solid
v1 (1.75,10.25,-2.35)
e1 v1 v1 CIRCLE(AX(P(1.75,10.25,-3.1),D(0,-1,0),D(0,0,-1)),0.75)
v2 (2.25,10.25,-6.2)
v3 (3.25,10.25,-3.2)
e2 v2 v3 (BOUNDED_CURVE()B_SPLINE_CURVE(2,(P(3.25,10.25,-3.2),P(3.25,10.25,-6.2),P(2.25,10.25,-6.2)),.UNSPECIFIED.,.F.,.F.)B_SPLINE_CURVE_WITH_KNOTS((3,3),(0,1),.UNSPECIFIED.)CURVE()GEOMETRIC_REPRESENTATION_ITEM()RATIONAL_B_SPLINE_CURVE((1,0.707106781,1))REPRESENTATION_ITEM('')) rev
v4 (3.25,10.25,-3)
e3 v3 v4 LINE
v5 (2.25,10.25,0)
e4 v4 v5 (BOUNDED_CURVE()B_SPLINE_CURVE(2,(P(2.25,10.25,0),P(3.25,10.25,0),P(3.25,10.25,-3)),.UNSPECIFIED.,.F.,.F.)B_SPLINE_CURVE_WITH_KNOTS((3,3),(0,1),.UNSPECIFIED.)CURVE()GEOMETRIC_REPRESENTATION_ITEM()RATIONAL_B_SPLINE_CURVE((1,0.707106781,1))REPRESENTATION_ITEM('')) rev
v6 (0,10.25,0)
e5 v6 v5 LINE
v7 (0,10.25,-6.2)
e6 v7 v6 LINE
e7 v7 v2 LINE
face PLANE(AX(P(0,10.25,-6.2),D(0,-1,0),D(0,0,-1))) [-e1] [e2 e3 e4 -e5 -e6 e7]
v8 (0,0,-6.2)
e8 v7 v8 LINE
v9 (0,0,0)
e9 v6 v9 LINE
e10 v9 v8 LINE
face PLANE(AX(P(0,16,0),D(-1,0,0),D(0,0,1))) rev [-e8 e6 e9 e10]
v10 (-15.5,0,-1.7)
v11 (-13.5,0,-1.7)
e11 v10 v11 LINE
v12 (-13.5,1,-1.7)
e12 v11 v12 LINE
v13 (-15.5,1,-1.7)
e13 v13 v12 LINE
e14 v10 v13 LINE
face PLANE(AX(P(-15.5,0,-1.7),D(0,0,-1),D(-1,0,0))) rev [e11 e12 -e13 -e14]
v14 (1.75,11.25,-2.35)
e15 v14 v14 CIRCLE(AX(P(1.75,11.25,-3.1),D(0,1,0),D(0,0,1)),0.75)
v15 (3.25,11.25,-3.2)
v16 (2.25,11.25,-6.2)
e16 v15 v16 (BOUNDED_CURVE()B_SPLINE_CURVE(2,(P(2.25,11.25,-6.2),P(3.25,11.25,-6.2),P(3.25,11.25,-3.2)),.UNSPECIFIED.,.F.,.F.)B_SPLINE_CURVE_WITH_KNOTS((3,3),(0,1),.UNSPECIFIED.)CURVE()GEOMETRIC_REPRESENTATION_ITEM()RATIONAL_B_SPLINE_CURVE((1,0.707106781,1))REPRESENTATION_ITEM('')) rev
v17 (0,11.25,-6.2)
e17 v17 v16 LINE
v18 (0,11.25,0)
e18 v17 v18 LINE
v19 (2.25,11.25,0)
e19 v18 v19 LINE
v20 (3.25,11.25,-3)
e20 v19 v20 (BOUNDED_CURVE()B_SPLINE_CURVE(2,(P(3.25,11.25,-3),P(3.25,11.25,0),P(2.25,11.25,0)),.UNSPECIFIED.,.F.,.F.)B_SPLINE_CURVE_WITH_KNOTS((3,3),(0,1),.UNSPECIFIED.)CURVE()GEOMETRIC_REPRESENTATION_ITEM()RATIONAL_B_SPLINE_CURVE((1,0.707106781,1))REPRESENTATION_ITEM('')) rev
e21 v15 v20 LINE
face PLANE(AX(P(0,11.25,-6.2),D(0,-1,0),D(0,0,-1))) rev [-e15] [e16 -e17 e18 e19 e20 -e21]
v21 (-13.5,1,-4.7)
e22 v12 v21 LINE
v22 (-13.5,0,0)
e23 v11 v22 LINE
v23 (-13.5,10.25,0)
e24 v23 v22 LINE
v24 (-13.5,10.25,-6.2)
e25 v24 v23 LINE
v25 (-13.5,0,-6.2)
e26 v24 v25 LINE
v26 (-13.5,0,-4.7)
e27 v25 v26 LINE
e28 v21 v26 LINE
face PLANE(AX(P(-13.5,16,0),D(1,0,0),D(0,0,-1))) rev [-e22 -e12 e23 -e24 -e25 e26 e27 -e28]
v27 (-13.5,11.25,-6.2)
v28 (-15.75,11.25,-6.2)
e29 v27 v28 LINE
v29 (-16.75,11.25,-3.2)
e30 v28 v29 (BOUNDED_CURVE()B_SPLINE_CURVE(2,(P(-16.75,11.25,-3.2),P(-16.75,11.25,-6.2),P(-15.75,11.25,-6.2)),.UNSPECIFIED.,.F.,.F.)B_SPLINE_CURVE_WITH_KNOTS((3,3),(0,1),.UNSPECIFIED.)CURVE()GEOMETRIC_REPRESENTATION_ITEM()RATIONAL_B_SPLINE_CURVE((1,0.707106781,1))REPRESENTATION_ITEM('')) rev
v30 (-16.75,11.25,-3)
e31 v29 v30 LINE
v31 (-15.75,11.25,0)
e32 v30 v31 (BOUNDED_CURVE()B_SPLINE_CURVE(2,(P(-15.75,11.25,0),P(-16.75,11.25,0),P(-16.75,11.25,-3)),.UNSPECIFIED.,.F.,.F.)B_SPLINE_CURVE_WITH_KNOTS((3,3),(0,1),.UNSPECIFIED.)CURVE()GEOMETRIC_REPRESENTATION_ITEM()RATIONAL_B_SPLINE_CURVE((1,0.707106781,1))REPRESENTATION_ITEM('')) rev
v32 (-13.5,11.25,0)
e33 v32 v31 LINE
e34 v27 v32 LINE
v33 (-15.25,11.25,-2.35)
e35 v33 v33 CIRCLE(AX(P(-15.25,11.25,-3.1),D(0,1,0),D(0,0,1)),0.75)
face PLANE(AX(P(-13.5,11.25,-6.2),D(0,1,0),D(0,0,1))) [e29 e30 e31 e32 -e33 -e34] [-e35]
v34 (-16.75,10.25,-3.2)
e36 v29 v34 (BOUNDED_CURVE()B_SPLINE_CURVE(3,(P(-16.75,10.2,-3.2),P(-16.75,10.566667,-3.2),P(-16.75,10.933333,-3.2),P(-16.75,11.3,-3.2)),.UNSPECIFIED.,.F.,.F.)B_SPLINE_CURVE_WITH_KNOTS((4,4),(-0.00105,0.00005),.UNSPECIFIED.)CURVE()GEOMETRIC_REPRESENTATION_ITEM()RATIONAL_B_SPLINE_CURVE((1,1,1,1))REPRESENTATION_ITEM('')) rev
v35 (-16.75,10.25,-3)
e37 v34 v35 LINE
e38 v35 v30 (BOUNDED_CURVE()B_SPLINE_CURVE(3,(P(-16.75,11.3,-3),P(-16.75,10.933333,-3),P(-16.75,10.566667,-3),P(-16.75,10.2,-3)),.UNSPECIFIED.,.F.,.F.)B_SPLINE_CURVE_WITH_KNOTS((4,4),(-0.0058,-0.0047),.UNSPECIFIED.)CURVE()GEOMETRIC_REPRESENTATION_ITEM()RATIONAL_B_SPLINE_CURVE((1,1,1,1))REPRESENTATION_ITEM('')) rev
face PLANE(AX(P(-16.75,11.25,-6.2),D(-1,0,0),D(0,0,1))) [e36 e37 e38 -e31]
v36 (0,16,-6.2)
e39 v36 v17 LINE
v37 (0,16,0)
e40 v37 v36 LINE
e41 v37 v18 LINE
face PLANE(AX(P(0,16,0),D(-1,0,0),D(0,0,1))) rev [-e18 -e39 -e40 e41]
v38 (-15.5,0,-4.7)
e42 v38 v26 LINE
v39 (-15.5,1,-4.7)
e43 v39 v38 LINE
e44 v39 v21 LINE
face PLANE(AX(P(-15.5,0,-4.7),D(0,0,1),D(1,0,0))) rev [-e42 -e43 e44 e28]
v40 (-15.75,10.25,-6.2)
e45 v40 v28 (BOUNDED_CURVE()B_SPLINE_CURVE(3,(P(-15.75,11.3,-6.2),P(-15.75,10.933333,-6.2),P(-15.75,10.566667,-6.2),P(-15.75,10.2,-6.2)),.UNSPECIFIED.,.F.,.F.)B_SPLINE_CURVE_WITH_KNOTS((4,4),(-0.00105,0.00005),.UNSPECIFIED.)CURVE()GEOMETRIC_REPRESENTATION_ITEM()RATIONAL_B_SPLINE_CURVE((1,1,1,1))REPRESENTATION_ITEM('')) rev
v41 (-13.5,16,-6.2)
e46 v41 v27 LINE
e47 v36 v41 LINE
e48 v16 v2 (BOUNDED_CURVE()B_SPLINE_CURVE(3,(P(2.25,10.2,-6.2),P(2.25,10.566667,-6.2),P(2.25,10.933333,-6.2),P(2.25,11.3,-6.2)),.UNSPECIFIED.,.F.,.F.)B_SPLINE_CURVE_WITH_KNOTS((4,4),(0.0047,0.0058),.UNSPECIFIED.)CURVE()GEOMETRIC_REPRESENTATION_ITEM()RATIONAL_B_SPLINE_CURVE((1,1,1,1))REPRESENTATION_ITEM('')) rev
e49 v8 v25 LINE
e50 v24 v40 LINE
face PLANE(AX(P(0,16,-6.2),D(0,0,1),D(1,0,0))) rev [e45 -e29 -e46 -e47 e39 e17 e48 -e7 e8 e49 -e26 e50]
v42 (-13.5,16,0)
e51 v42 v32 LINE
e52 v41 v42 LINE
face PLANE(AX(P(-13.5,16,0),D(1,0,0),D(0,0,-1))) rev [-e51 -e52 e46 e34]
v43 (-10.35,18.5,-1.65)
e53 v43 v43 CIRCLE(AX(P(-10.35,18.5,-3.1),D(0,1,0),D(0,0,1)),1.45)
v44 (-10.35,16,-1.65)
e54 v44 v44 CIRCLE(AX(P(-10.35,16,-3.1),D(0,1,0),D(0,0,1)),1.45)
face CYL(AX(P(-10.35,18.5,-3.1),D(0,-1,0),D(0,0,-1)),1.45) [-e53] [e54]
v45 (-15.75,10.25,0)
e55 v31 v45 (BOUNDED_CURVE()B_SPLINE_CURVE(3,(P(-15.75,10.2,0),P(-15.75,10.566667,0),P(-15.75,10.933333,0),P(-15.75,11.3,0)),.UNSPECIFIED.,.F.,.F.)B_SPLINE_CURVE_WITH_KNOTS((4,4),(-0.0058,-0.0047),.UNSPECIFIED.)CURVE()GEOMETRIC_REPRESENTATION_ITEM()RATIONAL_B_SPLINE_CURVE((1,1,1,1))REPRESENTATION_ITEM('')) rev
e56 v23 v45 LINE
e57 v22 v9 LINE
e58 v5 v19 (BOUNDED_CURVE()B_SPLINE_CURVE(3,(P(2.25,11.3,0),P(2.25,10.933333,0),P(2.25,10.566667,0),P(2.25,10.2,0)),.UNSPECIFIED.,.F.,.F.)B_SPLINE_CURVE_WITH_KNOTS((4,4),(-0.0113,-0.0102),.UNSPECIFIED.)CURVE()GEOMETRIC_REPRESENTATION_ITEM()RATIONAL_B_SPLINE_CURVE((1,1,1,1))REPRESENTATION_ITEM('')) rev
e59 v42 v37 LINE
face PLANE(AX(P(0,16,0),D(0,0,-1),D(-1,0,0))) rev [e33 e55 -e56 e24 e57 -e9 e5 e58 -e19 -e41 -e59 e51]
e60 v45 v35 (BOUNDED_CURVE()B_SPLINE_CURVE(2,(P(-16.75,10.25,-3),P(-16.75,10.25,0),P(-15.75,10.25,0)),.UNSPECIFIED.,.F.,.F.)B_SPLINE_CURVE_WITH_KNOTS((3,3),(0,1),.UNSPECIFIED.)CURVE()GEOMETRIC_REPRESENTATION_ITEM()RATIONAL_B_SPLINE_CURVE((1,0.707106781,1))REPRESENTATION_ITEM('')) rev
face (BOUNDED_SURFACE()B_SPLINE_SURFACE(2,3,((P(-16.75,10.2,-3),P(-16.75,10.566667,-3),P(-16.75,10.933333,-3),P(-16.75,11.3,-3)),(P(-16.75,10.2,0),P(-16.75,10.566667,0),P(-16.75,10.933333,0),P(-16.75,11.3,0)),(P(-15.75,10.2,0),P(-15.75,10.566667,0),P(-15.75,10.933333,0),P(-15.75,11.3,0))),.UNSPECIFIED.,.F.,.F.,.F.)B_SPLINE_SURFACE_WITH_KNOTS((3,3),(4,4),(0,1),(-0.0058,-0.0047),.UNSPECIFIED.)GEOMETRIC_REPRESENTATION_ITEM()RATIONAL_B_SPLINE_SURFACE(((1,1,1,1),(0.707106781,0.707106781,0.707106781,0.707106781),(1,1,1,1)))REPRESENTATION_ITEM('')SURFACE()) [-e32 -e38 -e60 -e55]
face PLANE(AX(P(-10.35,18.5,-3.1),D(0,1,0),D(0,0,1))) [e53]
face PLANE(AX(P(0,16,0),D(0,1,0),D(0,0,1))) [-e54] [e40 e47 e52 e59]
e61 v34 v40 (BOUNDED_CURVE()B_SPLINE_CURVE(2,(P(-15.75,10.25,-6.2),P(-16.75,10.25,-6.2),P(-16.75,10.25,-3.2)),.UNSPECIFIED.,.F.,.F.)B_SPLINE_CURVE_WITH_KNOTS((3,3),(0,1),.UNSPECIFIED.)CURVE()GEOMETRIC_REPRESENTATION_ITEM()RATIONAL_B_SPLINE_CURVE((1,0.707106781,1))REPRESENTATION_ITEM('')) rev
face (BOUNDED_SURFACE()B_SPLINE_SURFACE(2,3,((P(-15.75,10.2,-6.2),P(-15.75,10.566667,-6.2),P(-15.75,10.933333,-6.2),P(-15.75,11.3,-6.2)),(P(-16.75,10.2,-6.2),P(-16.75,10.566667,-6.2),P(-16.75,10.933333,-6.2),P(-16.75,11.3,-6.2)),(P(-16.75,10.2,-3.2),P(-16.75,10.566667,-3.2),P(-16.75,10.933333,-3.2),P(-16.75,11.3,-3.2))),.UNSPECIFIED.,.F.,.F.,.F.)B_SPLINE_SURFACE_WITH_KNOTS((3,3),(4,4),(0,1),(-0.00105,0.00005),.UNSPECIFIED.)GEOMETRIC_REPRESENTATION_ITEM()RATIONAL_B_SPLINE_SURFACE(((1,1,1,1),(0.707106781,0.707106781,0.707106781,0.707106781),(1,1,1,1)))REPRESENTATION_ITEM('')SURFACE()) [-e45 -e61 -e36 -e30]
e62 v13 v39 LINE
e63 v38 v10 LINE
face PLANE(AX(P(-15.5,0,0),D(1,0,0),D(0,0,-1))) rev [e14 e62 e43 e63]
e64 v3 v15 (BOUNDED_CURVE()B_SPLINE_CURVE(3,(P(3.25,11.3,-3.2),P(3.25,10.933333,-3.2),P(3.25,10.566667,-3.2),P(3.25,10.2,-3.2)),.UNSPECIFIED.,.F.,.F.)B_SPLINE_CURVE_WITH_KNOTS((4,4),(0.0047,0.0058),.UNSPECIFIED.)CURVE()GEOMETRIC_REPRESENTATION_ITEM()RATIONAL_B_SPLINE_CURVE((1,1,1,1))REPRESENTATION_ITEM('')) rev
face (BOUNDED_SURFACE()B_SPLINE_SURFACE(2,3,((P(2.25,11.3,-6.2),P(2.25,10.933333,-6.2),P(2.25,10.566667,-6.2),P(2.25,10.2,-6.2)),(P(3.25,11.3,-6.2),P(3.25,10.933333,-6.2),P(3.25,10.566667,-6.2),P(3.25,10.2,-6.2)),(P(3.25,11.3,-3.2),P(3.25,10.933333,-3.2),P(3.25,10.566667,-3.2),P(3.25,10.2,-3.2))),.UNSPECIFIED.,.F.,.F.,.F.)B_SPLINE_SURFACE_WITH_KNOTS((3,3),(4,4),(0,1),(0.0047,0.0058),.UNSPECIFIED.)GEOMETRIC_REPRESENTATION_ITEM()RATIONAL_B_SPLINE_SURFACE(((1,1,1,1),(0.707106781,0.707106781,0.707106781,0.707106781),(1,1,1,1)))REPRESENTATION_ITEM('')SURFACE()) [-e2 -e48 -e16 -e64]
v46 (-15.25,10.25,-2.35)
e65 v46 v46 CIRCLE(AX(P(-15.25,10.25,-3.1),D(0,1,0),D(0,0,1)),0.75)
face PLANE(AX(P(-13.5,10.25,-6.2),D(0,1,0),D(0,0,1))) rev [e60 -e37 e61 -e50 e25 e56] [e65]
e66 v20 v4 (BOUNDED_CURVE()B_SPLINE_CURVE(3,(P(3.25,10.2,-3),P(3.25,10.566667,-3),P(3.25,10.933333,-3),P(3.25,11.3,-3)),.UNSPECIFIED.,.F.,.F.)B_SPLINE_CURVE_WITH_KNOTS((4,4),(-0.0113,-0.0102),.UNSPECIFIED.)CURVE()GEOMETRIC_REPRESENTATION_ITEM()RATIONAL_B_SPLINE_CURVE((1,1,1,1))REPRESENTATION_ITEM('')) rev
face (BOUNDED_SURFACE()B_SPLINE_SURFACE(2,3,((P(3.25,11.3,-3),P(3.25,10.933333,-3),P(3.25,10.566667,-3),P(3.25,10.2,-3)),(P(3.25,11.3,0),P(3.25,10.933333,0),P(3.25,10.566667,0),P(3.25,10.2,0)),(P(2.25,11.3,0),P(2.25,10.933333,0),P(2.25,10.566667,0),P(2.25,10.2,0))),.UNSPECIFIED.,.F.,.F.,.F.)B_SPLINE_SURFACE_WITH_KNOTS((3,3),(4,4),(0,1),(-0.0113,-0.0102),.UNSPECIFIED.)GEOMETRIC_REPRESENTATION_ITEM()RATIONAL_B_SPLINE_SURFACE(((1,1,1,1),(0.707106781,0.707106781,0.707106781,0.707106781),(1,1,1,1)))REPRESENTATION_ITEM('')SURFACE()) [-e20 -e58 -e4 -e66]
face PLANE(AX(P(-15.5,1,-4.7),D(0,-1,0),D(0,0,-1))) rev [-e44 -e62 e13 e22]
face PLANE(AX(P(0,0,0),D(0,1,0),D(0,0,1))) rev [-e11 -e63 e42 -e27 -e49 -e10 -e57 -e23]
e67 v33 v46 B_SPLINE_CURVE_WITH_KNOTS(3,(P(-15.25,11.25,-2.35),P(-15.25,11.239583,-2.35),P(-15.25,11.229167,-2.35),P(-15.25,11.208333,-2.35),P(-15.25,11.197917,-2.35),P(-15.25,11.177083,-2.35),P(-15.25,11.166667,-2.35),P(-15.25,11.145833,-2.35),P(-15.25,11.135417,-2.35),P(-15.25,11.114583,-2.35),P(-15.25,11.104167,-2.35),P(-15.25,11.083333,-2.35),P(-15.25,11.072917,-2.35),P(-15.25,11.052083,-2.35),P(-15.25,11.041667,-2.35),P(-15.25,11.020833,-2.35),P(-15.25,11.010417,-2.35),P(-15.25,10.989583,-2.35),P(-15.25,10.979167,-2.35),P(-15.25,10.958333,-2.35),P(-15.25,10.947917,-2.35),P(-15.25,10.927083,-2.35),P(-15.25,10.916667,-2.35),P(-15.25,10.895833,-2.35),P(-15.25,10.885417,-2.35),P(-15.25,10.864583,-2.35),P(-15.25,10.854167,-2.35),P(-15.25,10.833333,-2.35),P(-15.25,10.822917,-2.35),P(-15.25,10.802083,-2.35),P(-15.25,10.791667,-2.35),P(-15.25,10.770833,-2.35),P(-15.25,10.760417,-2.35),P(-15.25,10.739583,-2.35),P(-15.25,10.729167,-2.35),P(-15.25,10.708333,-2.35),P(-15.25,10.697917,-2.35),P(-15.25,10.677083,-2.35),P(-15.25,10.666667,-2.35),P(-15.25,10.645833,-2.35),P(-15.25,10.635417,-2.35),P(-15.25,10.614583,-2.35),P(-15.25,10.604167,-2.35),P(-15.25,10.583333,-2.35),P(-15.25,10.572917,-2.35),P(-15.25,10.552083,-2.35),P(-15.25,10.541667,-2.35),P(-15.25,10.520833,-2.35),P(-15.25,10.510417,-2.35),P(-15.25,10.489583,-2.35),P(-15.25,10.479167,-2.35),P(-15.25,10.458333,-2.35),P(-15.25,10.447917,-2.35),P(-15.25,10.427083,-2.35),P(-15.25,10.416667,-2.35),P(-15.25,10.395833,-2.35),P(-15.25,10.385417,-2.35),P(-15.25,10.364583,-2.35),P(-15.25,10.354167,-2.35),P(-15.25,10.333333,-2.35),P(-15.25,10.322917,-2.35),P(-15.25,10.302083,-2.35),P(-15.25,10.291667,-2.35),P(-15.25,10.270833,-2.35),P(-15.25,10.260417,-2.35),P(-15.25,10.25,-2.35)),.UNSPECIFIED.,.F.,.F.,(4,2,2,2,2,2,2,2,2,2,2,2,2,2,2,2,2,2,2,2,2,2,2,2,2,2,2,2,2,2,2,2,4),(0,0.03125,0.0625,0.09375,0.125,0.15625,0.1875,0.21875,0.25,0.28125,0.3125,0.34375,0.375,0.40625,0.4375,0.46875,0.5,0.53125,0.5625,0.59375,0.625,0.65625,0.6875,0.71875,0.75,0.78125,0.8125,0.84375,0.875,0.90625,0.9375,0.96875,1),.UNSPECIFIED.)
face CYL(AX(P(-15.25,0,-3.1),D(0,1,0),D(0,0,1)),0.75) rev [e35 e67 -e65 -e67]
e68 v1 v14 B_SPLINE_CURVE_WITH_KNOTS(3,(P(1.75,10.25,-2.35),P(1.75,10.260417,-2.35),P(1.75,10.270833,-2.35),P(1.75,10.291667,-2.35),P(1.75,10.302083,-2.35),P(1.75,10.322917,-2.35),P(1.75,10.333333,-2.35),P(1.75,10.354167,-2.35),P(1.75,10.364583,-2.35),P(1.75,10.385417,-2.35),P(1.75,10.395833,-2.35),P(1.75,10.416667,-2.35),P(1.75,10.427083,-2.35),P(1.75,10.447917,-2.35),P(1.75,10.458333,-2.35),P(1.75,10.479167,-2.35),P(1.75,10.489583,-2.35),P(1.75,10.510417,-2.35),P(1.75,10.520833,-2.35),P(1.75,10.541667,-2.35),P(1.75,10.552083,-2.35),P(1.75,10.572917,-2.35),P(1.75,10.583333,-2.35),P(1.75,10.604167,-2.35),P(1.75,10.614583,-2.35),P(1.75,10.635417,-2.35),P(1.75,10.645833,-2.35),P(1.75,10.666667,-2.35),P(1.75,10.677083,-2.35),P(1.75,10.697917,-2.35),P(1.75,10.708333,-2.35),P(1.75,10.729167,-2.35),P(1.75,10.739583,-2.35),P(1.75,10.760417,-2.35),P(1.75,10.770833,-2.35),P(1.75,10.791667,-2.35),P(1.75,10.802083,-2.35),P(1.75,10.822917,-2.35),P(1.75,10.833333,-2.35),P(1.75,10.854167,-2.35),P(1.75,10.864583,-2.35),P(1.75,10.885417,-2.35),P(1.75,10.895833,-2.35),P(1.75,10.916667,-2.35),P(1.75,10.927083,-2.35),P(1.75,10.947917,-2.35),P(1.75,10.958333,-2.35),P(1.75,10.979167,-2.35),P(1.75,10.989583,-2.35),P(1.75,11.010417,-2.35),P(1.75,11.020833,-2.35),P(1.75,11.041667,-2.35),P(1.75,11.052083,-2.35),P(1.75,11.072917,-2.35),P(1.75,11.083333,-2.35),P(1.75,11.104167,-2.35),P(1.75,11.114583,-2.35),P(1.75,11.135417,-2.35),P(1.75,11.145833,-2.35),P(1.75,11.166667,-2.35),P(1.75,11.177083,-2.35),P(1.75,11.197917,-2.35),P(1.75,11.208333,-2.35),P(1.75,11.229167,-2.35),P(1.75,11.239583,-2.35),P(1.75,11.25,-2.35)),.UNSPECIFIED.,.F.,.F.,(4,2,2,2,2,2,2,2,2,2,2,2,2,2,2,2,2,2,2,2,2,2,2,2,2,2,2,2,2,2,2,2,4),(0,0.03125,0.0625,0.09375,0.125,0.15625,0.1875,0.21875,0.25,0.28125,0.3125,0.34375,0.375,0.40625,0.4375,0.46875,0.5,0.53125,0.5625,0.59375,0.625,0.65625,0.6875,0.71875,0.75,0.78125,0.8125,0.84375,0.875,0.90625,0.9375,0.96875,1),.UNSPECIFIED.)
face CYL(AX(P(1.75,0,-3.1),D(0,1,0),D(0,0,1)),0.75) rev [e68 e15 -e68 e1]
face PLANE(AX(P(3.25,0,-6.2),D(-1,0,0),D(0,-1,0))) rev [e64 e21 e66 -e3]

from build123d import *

# Parameters (mm, degrees)
SKETCH_1_W          = 13.5
SKETCH_1_H          = 6.2
EXTRUDE_1_DEPTH     = 16
SKETCH_2_W          = 3.25
SKETCH_2_H          = 1
EXTRUDE_2_DEPTH     = 6.2
SKETCH_3_R          = 0.75
CUT_EXTRUDE_1_DEPTH = 22.108410646
SKETCH_4_R          = 1.45
EXTRUDE_3_DEPTH     = 2.5
FILLET_1_SIZE       = 1
FILLET_1_SIZE_2     = 3
FILLET_2_SIZE       = 1
FILLET_2_SIZE_2     = 3
SKETCH_5_W          = 3
SKETCH_5_H          = 1
EXTRUDE_4_DEPTH     = 2


with BuildPart() as part:
    # 草图1 → 凸台-拉伸1 (new body)
    with BuildSketch(Plane(origin=(0, 0, 0), x_dir=(1, 0, 0), z_dir=(0, 1, 0))):
        with Locations((-6.75, 3.1)):
            Rectangle(SKETCH_1_W, SKETCH_1_H)
    extrude(amount=EXTRUDE_1_DEPTH)

    # 草图2 → 凸台-拉伸2 (add)
    with BuildSketch(Plane.XY):
        with Locations((1.625, 10.75)):
            Rectangle(SKETCH_2_W, SKETCH_2_H)
        with Locations((-15.125, 10.75)):
            Rectangle(SKETCH_2_W, SKETCH_2_H)
    extrude(amount=-EXTRUDE_2_DEPTH)

    # 草图3 → 切除-拉伸1 (cut, through all)
    with BuildSketch(Plane(origin=(0, 11.25, 0), x_dir=(1, 0, 0), z_dir=(0, 1, 0))):
        with Locations(Location((-15.25, 3.1, 0), (0, 0, 270))):
            Circle(SKETCH_3_R)
        with Locations(Location((1.75, 3.1, 0), (0, 0, 270))):
            Circle(SKETCH_3_R)
    extrude(amount=-CUT_EXTRUDE_1_DEPTH, mode=Mode.SUBTRACT)

    # 草图4 → 凸台-拉伸3 (add)
    with BuildSketch(Plane(origin=(0, 16, 0), x_dir=(1, 0, 0), z_dir=(0, 1, 0))):
        with Locations(Location((-10.35, 3.1, 0), (0, 0, 270))):
            Circle(SKETCH_4_R)
    extrude(amount=EXTRUDE_3_DEPTH)

    # 圆角1
    # an asymmetric fillet: 3, 1 mm, written as the material it takes off along each edge
    with BuildSketch(Plane(origin=(3.25, 2.75, 0), x_dir=(-1, 0, 0), z_dir=(0, 1, 0))) as fillet_1_piece_1:
        with BuildLine():
            Bezier((FILLET_1_SIZE, 0), (0, 0), (0, -FILLET_1_SIZE_2), weights=[1, 0.707106781, 1])
            Line((0, -FILLET_1_SIZE_2), (0, 0))
            Line((0, 0), (FILLET_1_SIZE, 0))
        make_face()
    extrude(amount=16, mode=Mode.SUBTRACT)
    with BuildSketch(Plane(origin=(-16.75, 2.75, -6.2), x_dir=(0, 0, 1), z_dir=(0, 1, 0))) as fillet_1_piece_2:
        with BuildLine():
            Bezier((FILLET_1_SIZE_2, 0), (0, 0), (0, FILLET_1_SIZE), weights=[1, 0.707106781, 1])
            Line((0, FILLET_1_SIZE), (0, 0))
            Line((0, 0), (FILLET_1_SIZE_2, 0))
        make_face()
    extrude(amount=16, mode=Mode.SUBTRACT)

    # 圆角2
    # an asymmetric fillet: 3, 1 mm, written as the material it takes off along each edge
    with BuildSketch(Plane(origin=(-16.75, 2.75, 0), x_dir=(1, 0, 0), z_dir=(0, 1, 0)), Plane(origin=(3.25, 2.75, -6.2), x_dir=(-1, 0, 0), z_dir=(0, 1, 0))) as fillet_2_piece_1:
        with BuildLine():
            Bezier((FILLET_2_SIZE, 0), (0, 0), (0, FILLET_2_SIZE_2), weights=[1, 0.707106781, 1])
            Line((0, FILLET_2_SIZE_2), (0, 0))
            Line((0, 0), (FILLET_2_SIZE, 0))
        make_face()
    extrude(amount=16, mode=Mode.SUBTRACT)

    # 草图5 → 凸台-拉伸4 (add)
    with BuildSketch(Plane.ZY.offset(13.5)):
        with Locations((-3.2, 0.5)):
            Rectangle(SKETCH_5_W, SKETCH_5_H)
    extrude(amount=EXTRUDE_4_DEPTH)


solid = part.part
